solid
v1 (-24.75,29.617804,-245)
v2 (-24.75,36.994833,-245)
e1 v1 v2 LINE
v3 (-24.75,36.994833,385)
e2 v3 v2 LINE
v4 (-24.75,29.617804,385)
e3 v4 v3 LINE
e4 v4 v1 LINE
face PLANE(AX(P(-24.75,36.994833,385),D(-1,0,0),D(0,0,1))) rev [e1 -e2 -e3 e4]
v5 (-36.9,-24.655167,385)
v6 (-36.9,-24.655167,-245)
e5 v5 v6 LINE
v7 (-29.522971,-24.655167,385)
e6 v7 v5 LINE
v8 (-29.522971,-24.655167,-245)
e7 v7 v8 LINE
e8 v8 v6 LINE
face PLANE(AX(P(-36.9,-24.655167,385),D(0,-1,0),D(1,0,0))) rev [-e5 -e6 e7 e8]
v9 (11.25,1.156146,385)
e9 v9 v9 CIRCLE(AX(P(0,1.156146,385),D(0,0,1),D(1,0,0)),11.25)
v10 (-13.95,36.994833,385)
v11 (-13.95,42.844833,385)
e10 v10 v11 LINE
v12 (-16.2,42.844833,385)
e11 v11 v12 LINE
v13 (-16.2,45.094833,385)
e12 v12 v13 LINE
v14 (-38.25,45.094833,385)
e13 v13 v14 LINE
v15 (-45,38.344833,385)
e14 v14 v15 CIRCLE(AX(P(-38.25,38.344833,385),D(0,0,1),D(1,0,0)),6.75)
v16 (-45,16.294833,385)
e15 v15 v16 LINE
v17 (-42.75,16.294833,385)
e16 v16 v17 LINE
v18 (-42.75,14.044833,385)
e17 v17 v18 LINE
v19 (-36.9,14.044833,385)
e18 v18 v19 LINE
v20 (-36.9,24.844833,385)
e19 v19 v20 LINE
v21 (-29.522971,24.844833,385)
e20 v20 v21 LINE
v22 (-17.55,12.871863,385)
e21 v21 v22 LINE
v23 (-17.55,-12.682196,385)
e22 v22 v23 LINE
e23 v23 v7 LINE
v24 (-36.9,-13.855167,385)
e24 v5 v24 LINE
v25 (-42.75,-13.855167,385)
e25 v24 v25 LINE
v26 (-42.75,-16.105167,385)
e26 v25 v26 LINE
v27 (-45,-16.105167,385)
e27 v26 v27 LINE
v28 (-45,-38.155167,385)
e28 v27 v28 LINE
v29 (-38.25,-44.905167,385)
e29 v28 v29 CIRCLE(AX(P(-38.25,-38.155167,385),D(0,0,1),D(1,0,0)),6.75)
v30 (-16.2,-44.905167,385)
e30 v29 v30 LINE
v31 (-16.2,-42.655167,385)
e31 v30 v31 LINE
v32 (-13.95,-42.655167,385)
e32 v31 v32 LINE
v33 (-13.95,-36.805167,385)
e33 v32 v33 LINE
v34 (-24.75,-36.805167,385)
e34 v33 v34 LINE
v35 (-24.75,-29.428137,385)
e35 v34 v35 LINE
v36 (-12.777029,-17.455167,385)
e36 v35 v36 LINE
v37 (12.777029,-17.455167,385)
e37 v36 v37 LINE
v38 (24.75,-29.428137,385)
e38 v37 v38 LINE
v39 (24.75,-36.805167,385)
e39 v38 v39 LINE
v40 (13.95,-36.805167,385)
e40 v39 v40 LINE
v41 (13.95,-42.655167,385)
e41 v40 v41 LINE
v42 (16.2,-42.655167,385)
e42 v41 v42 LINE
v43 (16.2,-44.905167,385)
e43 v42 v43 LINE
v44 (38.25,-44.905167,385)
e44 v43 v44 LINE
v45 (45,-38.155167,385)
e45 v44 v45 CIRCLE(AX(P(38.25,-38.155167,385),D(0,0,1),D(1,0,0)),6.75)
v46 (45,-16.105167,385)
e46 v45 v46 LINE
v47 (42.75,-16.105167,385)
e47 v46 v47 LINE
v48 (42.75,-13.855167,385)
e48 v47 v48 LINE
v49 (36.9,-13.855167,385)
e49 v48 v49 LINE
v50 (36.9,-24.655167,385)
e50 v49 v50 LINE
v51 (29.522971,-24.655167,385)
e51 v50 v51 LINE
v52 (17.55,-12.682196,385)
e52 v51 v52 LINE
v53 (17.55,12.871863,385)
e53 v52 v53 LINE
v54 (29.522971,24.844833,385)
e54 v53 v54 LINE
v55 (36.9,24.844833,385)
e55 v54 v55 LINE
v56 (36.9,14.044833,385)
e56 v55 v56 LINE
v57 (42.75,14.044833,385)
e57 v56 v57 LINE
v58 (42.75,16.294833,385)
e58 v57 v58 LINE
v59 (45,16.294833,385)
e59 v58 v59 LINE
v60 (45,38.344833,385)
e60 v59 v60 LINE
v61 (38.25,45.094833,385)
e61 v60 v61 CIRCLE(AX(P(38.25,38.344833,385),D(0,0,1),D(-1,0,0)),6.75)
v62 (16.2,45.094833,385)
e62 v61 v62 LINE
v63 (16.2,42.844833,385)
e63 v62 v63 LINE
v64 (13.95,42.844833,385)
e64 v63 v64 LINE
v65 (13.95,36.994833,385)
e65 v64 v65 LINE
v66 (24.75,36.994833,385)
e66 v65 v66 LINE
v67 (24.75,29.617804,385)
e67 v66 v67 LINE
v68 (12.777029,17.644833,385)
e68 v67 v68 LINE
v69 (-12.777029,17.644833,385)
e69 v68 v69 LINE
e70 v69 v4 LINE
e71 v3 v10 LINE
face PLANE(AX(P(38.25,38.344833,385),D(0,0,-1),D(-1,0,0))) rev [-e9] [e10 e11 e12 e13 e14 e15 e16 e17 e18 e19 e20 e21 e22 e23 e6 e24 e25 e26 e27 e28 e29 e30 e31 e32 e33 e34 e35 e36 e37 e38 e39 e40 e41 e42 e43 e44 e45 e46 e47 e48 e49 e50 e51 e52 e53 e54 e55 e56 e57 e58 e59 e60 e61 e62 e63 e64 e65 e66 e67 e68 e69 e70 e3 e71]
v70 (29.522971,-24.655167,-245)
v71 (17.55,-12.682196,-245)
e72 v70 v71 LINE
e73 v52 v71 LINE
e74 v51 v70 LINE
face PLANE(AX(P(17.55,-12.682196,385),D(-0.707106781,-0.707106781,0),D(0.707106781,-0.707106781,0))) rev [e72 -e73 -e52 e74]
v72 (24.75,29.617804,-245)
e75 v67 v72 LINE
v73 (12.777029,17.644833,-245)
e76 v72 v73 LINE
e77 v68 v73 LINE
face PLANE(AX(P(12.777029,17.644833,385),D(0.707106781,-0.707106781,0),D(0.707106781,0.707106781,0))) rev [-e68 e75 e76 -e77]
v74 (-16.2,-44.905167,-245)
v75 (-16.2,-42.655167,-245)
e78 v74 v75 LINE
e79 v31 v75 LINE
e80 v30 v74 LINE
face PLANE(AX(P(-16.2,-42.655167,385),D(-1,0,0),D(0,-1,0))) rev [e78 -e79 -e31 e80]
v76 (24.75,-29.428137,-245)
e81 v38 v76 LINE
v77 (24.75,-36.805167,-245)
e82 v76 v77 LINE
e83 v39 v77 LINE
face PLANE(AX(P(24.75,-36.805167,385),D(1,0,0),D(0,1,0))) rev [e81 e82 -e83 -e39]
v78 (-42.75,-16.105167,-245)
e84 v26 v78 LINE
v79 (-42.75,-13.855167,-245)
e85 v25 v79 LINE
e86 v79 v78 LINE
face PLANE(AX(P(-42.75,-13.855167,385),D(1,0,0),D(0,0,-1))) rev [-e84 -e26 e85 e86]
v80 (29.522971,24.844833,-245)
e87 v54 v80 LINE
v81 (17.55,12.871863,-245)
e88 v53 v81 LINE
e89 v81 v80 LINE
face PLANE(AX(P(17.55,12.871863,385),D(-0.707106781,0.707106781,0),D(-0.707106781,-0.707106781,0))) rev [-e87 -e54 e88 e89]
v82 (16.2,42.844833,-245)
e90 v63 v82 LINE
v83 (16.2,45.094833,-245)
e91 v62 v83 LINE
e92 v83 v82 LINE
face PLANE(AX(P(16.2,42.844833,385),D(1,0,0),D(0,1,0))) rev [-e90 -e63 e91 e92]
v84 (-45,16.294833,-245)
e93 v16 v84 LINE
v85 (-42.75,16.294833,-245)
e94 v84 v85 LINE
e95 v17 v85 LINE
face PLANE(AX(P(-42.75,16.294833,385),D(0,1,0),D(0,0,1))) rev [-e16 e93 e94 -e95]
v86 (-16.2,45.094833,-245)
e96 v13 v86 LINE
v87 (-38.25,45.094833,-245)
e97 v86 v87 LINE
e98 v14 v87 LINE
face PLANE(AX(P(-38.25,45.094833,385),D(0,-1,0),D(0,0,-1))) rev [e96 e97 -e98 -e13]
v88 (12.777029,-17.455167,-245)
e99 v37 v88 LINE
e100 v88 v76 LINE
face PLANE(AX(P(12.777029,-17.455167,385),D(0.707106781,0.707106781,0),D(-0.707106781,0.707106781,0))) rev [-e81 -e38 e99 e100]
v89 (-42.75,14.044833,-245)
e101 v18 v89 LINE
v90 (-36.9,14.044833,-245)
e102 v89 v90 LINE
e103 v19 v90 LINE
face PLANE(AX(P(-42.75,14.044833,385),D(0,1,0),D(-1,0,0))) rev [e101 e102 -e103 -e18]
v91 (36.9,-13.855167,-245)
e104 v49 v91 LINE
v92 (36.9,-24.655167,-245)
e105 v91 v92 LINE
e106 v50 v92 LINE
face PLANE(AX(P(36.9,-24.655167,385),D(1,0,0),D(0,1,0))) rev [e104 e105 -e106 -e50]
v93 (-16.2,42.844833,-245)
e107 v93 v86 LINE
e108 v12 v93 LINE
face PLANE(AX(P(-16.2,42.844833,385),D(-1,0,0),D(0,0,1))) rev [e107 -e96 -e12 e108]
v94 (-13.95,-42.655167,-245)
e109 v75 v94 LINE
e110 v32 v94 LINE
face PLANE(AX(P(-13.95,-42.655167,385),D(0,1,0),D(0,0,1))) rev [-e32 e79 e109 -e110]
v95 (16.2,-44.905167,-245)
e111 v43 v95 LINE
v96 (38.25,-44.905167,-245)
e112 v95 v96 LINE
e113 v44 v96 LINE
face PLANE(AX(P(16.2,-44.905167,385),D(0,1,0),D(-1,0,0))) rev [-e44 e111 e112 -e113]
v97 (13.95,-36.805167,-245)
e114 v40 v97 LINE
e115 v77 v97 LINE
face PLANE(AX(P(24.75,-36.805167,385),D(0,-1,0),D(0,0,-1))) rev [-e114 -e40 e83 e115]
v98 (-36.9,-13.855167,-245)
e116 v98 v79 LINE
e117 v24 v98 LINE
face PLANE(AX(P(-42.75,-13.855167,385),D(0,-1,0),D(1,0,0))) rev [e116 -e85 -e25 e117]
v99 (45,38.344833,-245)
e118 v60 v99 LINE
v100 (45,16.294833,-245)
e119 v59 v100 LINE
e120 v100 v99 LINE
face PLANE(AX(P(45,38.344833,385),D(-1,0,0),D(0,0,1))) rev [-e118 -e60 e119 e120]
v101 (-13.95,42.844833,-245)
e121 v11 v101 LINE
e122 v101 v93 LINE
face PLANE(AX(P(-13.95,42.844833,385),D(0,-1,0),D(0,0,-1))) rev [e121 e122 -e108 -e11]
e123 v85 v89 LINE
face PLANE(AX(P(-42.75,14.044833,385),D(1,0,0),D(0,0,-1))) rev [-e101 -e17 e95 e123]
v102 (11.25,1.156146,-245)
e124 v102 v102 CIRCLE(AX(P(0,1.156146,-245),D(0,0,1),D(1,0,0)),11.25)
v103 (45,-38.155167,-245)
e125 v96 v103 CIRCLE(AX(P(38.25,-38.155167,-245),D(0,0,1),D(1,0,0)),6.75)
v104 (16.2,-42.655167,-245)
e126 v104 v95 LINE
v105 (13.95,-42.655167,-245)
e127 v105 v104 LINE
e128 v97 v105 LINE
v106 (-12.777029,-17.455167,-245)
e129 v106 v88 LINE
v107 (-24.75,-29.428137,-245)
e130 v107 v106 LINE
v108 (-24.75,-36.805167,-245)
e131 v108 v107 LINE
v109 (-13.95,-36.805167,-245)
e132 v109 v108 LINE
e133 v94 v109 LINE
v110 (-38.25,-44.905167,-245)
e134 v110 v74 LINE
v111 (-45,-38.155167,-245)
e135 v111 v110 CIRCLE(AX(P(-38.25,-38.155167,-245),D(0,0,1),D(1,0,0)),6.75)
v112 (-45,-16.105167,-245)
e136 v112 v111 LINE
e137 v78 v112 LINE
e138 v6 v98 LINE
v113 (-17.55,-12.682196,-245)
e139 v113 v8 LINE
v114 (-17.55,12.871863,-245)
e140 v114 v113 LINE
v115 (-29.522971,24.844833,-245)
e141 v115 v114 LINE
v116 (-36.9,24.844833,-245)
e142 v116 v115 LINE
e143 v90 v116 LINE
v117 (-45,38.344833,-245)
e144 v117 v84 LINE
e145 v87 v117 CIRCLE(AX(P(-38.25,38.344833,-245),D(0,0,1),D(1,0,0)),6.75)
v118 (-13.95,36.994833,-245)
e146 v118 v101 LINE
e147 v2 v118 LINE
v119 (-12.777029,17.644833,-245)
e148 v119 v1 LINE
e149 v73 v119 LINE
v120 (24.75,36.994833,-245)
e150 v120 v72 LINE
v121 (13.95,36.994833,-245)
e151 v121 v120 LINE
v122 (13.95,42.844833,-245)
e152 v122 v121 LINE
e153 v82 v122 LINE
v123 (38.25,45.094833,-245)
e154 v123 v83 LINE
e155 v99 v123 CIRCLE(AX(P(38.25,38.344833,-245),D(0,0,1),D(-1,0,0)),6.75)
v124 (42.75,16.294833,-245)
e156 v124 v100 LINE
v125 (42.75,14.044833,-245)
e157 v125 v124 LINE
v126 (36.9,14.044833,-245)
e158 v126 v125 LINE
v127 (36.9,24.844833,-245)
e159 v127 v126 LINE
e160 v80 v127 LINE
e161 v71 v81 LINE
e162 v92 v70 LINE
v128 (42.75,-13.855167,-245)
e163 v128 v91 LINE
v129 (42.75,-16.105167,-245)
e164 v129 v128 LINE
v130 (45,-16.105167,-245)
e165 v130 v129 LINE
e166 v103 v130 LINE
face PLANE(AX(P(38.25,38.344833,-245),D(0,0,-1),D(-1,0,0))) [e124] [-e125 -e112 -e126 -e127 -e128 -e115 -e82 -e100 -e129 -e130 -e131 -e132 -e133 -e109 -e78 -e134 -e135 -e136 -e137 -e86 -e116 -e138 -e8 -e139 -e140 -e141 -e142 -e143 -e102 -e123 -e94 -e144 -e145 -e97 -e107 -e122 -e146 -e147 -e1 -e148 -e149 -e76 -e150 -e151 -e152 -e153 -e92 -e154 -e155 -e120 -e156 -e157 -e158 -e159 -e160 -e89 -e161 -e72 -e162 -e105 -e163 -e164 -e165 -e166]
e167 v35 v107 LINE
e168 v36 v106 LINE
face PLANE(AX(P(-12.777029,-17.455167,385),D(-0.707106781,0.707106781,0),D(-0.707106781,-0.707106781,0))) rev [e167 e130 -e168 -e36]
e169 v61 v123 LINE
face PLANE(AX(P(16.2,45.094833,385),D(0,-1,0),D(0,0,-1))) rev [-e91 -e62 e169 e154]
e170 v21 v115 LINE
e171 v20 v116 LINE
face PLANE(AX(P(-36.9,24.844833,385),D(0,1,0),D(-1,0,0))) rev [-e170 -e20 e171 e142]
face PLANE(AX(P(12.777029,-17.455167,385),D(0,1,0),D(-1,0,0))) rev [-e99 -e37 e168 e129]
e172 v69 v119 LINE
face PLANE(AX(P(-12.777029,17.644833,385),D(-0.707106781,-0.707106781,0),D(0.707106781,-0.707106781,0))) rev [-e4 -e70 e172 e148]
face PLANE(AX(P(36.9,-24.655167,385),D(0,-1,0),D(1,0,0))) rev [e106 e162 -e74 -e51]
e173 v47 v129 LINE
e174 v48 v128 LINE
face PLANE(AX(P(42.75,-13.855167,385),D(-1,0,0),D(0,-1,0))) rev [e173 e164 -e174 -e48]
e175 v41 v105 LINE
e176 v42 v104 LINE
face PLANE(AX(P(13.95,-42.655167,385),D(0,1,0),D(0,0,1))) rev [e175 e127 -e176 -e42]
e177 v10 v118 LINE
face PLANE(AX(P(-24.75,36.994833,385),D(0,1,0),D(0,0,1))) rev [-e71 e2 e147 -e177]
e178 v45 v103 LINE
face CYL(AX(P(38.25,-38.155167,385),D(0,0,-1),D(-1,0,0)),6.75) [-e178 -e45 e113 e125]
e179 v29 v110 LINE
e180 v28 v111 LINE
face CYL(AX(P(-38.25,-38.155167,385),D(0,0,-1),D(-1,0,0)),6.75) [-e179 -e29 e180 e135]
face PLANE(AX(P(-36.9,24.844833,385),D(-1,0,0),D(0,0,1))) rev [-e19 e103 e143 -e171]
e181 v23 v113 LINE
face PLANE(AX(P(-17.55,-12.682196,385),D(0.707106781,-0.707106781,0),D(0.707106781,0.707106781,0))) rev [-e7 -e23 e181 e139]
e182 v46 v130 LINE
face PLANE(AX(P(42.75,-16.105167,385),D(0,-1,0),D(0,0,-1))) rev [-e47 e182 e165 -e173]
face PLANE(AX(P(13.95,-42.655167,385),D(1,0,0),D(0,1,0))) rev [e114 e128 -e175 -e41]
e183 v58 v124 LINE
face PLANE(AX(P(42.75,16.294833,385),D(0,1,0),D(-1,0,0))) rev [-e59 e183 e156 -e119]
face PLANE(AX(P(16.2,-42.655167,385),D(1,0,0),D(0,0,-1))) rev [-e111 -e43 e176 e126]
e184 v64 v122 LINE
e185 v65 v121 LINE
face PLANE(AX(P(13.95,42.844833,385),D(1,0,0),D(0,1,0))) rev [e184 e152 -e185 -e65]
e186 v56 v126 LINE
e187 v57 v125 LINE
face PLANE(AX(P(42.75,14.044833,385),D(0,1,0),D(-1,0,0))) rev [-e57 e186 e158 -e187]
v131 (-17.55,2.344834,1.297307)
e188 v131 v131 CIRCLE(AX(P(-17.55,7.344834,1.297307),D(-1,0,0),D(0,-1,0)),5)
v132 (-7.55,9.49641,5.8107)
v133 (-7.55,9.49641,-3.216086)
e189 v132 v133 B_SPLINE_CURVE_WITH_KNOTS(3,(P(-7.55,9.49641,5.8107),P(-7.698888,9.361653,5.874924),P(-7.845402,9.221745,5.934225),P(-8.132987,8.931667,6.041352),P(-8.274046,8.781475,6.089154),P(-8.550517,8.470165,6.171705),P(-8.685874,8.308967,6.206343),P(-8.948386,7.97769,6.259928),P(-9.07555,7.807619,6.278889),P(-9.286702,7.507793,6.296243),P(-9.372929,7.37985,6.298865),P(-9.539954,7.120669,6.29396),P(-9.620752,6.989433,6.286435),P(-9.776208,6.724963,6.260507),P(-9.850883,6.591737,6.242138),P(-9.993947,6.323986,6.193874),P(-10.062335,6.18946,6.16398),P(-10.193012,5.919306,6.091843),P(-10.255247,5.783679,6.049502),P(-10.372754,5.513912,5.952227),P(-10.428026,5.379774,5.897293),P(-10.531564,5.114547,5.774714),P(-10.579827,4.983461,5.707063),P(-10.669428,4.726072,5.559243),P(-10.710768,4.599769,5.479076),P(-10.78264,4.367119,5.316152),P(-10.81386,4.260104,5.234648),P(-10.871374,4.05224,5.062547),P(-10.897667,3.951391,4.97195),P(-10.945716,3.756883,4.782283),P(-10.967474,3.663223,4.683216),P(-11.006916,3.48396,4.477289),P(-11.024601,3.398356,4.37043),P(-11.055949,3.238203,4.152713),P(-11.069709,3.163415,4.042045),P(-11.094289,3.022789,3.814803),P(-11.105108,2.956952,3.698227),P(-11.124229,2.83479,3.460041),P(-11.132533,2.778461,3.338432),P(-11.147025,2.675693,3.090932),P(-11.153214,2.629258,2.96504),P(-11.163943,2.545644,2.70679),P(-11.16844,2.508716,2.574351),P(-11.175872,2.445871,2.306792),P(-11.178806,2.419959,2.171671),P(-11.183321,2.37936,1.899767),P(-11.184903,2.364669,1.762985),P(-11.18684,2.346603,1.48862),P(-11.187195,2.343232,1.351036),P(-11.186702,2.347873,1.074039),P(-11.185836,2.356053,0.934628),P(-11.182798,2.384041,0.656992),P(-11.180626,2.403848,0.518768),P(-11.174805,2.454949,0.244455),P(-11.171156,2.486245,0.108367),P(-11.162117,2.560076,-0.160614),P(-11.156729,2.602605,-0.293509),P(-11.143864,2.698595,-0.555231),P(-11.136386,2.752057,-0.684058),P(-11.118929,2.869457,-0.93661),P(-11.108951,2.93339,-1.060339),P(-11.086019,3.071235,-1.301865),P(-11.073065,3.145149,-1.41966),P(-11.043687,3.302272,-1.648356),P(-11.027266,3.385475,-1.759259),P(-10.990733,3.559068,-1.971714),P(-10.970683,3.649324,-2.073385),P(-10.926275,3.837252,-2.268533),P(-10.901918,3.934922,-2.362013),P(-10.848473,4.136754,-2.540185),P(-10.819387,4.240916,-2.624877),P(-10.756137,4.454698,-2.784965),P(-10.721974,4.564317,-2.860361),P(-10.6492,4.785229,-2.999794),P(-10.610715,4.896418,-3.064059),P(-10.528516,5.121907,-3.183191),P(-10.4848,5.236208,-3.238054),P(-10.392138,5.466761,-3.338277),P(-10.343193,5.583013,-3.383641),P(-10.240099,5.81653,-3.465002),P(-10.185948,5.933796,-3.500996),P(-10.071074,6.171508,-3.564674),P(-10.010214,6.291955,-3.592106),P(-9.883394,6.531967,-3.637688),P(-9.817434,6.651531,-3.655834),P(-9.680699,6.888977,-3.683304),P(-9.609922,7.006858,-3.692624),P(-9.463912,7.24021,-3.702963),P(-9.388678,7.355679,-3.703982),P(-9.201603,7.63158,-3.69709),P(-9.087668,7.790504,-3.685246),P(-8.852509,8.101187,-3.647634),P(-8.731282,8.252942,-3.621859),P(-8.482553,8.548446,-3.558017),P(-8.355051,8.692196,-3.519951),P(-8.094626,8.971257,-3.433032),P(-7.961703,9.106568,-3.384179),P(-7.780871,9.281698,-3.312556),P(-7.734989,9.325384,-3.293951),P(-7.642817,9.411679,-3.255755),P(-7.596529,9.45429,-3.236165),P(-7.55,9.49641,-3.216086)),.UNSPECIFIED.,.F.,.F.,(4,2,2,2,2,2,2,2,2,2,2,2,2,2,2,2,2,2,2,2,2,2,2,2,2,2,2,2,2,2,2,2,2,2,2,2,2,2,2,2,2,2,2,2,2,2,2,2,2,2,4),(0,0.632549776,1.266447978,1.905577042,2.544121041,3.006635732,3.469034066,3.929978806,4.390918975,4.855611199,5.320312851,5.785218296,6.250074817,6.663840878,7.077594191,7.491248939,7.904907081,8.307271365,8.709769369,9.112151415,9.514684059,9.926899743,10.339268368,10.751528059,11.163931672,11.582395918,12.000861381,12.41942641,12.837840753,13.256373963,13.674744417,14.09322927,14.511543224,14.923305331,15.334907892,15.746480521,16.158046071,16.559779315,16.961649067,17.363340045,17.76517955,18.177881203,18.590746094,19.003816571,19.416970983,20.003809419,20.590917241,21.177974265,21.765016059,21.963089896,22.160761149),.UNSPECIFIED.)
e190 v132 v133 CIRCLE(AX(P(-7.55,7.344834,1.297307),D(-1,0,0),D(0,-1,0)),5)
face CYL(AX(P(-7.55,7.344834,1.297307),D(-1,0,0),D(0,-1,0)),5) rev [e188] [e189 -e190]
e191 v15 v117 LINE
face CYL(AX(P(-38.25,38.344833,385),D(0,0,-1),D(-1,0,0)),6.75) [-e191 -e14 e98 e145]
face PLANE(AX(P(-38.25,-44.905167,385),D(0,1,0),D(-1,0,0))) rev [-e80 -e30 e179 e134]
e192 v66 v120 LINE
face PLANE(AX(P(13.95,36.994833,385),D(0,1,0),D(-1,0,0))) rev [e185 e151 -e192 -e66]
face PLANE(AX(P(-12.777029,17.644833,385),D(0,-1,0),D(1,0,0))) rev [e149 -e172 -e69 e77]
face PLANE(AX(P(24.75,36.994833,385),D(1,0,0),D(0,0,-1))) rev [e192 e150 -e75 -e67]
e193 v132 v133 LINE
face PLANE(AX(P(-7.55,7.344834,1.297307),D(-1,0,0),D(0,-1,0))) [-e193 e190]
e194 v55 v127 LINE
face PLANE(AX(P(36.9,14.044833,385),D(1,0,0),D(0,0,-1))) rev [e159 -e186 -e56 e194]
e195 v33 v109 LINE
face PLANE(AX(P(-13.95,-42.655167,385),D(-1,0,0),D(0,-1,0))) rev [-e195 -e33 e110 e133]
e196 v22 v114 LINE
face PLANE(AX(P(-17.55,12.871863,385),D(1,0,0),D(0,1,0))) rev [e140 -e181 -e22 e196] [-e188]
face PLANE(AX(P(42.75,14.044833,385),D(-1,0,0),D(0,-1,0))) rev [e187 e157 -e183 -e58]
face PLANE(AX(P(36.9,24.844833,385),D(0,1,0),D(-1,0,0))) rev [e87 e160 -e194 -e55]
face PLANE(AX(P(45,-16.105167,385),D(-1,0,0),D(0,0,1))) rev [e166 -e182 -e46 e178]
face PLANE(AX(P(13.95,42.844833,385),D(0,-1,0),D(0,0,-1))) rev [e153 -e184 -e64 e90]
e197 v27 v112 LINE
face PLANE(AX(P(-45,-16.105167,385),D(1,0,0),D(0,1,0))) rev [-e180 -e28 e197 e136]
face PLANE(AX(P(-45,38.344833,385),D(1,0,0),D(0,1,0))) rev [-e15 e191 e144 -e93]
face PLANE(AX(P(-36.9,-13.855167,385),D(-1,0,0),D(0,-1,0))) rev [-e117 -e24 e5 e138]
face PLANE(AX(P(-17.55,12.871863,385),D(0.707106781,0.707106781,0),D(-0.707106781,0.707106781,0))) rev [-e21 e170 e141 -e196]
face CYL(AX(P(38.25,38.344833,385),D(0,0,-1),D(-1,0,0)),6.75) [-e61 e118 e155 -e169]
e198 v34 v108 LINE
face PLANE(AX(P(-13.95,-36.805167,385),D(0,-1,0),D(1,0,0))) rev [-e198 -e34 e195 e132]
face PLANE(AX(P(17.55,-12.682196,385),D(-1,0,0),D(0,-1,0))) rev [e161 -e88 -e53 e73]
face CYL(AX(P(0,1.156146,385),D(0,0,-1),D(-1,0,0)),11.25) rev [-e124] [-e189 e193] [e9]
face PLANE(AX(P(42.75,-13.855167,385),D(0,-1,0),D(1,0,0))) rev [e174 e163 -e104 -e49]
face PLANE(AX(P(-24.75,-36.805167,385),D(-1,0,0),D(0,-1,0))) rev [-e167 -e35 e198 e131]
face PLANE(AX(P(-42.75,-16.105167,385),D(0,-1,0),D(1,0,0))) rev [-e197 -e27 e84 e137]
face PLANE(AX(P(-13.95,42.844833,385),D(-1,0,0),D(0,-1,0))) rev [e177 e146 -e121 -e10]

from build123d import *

# Parameters (mm, degrees)
SKETCH1_R           = 2.5
BOSS_EXTRUDE1_DEPTH = 140
SCALE_2_SCALE       = 3
SCALE_3_SCALE       = 6
SCALE_5_SCALE       = 2
SCALE_6_SCALE       = 0.25
SCALE_7_SCALE       = 0.125
SCALE_8_SCALE       = 0.25
SCALE_9_SCALE       = 4
SCALE_10_SCALE      = 4
OTHER_START         = -17.55
OTHER_1_OUTLINE_R   = 5
OTHER_1_DEPTH       = 10


# Read off the part's stored shape, not the designer's step: 孔1
with BuildPart() as part:
    # Sketch1 → Boss-Extrude1 (new body)
    with BuildSketch(Plane.XY):
        with BuildLine():
            Line((2.839339828, 3.9), (5.5, 6.560660172))
            Line((5.5, 6.560660172), (5.5, 8.2))
            Line((5.5, 8.2), (3.1, 8.2))
            Line((3.1, 8.2), (3.1, 9.5))
            Line((3.1, 9.5), (3.6, 9.5))
            Line((3.6, 9.5), (3.6, 10))
            Line((3.6, 10), (8.5, 10))
            ThreePointArc((8.5, 10), (9.560660172, 9.560660172), (10, 8.5))
            Line((10, 8.5), (10, 3.6))
            Line((10, 3.6), (9.5, 3.6))
            Line((9.5, 3.6), (9.5, 3.1))
            Line((9.5, 3.1), (8.2, 3.1))
            Line((8.2, 3.1), (8.2, 5.5))
            Line((8.2, 5.5), (6.560660172, 5.5))
            Line((6.560660172, 5.5), (3.9, 2.839339828))
            Line((3.9, 2.839339828), (3.9, -2.839339828))
            Line((3.9, -2.839339828), (6.560660172, -5.5))
            Line((6.560660172, -5.5), (8.2, -5.5))
            Line((8.2, -5.5), (8.2, -3.1))
            Line((8.2, -3.1), (9.5, -3.1))
            Line((9.5, -3.1), (9.5, -3.6))
            Line((9.5, -3.6), (10, -3.6))
            Line((10, -3.6), (10, -8.5))
            ThreePointArc((10, -8.5), (9.560660172, -9.560660172), (8.5, -10))
            Line((8.5, -10), (3.6, -10))
            Line((3.6, -10), (3.6, -9.5))
            Line((3.6, -9.5), (3.1, -9.5))
            Line((3.1, -9.5), (3.1, -8.2))
            Line((3.1, -8.2), (5.5, -8.2))
            Line((5.5, -8.2), (5.5, -6.560660172))
            Line((5.5, -6.560660172), (2.839339828, -3.9))
            Line((2.839339828, -3.9), (-2.839339828, -3.9))
            Line((-2.839339828, -3.9), (-5.5, -6.560660172))
            Line((-5.5, -6.560660172), (-5.5, -8.2))
            Line((-5.5, -8.2), (-3.1, -8.2))
            Line((-3.1, -8.2), (-3.1, -9.5))
            Line((-3.1, -9.5), (-3.6, -9.5))
            Line((-3.6, -9.5), (-3.6, -10))
            Line((-3.6, -10), (-8.5, -10))
            ThreePointArc((-8.5, -10), (-9.560660172, -9.560660172), (-10, -8.5))
            Line((-10, -8.5), (-10, -3.6))
            Line((-10, -3.6), (-9.5, -3.6))
            Line((-9.5, -3.6), (-9.5, -3.1))
            Line((-9.5, -3.1), (-8.2, -3.1))
            Line((-8.2, -3.1), (-8.2, -5.5))
            Line((-8.2, -5.5), (-6.560660172, -5.5))
            Line((-6.560660172, -5.5), (-3.9, -2.839339828))
            Line((-3.9, -2.839339828), (-3.9, 2.839339828))
            Line((-3.9, 2.839339828), (-6.560660172, 5.5))
            Line((-6.560660172, 5.5), (-8.2, 5.5))
            Line((-8.2, 5.5), (-8.2, 3.1))
            Line((-8.2, 3.1), (-9.5, 3.1))
            Line((-9.5, 3.1), (-9.5, 3.6))
            Line((-9.5, 3.6), (-10, 3.6))
            Line((-10, 3.6), (-10, 8.5))
            ThreePointArc((-10, 8.5), (-9.560660172, 9.560660172), (-8.5, 10))
            Line((-8.5, 10), (-3.6, 10))
            Line((-3.6, 10), (-3.6, 9.5))
            Line((-3.6, 9.5), (-3.1, 9.5))
            Line((-3.1, 9.5), (-3.1, 8.2))
            Line((-3.1, 8.2), (-5.5, 8.2))
            Line((-5.5, 8.2), (-5.5, 6.560660172))
            Line((-5.5, 6.560660172), (-2.839339828, 3.9))
            Line((-2.839339828, 3.9), (2.839339828, 3.9))
        make_face()
        with Locations((0, 0.235847297)):
            Circle(SKETCH1_R, mode=Mode.SUBTRACT)
    extrude(amount=BOSS_EXTRUDE1_DEPTH)


with BuildPart() as part_1:
    # 缩放比例2: scaled about (0, -0.027095247, 70)
    add(part.part.scale(SCALE_2_SCALE).moved(Location((0, 0.054190494, -140))))


with BuildPart() as part_2:
    # 缩放比例3: scaled about (0, -0.027095247, 70)
    add(part_1.part.scale(SCALE_3_SCALE).moved(Location((0, 0.135476235, -350))))


with BuildPart() as part_3:
    # 缩放比例5: scaled about (0, -0.027095249, 70)
    add(part_2.part.scale(SCALE_5_SCALE).moved(Location((0, 0.027095249, -70))))


with BuildPart() as part_4:
    # 缩放比例6: scaled about (0, -0.027095249, 70)
    add(part_3.part.scale(SCALE_6_SCALE).moved(Location((0, -0.020321437, 52.5))))


with BuildPart() as part_5:
    # 缩放比例7: scaled about (0, -0.027095249, 70)
    add(part_4.part.scale(SCALE_7_SCALE).moved(Location((0, -0.023708343, 61.25))))


with BuildPart() as part_6:
    # 缩放比例8: scaled about (0, -0.027095249, 70)
    add(part_5.part.scale(SCALE_8_SCALE).moved(Location((0, -0.020321437, 52.5))))


with BuildPart() as part_7:
    # 缩放比例9: scaled about (0, -0.027095249, 70)
    add(part_6.part.scale(SCALE_9_SCALE).moved(Location((0, 0.081285747, -210))))


with BuildPart() as part_8:
    # 缩放比例10: scaled about (0, -0.027095249, 70)
    add(part_7.part.scale(SCALE_10_SCALE).moved(Location((0, 0.081285747, -210))))

    # 孔1 outline → 孔1 (cut)
    with BuildSketch(Plane.YZ.offset(OTHER_START)):
        with Locations((7.344833538, 1.297306883)):
            Circle(OTHER_1_OUTLINE_R)
    extrude(amount=OTHER_1_DEPTH, mode=Mode.SUBTRACT)


solid = part_8.part
